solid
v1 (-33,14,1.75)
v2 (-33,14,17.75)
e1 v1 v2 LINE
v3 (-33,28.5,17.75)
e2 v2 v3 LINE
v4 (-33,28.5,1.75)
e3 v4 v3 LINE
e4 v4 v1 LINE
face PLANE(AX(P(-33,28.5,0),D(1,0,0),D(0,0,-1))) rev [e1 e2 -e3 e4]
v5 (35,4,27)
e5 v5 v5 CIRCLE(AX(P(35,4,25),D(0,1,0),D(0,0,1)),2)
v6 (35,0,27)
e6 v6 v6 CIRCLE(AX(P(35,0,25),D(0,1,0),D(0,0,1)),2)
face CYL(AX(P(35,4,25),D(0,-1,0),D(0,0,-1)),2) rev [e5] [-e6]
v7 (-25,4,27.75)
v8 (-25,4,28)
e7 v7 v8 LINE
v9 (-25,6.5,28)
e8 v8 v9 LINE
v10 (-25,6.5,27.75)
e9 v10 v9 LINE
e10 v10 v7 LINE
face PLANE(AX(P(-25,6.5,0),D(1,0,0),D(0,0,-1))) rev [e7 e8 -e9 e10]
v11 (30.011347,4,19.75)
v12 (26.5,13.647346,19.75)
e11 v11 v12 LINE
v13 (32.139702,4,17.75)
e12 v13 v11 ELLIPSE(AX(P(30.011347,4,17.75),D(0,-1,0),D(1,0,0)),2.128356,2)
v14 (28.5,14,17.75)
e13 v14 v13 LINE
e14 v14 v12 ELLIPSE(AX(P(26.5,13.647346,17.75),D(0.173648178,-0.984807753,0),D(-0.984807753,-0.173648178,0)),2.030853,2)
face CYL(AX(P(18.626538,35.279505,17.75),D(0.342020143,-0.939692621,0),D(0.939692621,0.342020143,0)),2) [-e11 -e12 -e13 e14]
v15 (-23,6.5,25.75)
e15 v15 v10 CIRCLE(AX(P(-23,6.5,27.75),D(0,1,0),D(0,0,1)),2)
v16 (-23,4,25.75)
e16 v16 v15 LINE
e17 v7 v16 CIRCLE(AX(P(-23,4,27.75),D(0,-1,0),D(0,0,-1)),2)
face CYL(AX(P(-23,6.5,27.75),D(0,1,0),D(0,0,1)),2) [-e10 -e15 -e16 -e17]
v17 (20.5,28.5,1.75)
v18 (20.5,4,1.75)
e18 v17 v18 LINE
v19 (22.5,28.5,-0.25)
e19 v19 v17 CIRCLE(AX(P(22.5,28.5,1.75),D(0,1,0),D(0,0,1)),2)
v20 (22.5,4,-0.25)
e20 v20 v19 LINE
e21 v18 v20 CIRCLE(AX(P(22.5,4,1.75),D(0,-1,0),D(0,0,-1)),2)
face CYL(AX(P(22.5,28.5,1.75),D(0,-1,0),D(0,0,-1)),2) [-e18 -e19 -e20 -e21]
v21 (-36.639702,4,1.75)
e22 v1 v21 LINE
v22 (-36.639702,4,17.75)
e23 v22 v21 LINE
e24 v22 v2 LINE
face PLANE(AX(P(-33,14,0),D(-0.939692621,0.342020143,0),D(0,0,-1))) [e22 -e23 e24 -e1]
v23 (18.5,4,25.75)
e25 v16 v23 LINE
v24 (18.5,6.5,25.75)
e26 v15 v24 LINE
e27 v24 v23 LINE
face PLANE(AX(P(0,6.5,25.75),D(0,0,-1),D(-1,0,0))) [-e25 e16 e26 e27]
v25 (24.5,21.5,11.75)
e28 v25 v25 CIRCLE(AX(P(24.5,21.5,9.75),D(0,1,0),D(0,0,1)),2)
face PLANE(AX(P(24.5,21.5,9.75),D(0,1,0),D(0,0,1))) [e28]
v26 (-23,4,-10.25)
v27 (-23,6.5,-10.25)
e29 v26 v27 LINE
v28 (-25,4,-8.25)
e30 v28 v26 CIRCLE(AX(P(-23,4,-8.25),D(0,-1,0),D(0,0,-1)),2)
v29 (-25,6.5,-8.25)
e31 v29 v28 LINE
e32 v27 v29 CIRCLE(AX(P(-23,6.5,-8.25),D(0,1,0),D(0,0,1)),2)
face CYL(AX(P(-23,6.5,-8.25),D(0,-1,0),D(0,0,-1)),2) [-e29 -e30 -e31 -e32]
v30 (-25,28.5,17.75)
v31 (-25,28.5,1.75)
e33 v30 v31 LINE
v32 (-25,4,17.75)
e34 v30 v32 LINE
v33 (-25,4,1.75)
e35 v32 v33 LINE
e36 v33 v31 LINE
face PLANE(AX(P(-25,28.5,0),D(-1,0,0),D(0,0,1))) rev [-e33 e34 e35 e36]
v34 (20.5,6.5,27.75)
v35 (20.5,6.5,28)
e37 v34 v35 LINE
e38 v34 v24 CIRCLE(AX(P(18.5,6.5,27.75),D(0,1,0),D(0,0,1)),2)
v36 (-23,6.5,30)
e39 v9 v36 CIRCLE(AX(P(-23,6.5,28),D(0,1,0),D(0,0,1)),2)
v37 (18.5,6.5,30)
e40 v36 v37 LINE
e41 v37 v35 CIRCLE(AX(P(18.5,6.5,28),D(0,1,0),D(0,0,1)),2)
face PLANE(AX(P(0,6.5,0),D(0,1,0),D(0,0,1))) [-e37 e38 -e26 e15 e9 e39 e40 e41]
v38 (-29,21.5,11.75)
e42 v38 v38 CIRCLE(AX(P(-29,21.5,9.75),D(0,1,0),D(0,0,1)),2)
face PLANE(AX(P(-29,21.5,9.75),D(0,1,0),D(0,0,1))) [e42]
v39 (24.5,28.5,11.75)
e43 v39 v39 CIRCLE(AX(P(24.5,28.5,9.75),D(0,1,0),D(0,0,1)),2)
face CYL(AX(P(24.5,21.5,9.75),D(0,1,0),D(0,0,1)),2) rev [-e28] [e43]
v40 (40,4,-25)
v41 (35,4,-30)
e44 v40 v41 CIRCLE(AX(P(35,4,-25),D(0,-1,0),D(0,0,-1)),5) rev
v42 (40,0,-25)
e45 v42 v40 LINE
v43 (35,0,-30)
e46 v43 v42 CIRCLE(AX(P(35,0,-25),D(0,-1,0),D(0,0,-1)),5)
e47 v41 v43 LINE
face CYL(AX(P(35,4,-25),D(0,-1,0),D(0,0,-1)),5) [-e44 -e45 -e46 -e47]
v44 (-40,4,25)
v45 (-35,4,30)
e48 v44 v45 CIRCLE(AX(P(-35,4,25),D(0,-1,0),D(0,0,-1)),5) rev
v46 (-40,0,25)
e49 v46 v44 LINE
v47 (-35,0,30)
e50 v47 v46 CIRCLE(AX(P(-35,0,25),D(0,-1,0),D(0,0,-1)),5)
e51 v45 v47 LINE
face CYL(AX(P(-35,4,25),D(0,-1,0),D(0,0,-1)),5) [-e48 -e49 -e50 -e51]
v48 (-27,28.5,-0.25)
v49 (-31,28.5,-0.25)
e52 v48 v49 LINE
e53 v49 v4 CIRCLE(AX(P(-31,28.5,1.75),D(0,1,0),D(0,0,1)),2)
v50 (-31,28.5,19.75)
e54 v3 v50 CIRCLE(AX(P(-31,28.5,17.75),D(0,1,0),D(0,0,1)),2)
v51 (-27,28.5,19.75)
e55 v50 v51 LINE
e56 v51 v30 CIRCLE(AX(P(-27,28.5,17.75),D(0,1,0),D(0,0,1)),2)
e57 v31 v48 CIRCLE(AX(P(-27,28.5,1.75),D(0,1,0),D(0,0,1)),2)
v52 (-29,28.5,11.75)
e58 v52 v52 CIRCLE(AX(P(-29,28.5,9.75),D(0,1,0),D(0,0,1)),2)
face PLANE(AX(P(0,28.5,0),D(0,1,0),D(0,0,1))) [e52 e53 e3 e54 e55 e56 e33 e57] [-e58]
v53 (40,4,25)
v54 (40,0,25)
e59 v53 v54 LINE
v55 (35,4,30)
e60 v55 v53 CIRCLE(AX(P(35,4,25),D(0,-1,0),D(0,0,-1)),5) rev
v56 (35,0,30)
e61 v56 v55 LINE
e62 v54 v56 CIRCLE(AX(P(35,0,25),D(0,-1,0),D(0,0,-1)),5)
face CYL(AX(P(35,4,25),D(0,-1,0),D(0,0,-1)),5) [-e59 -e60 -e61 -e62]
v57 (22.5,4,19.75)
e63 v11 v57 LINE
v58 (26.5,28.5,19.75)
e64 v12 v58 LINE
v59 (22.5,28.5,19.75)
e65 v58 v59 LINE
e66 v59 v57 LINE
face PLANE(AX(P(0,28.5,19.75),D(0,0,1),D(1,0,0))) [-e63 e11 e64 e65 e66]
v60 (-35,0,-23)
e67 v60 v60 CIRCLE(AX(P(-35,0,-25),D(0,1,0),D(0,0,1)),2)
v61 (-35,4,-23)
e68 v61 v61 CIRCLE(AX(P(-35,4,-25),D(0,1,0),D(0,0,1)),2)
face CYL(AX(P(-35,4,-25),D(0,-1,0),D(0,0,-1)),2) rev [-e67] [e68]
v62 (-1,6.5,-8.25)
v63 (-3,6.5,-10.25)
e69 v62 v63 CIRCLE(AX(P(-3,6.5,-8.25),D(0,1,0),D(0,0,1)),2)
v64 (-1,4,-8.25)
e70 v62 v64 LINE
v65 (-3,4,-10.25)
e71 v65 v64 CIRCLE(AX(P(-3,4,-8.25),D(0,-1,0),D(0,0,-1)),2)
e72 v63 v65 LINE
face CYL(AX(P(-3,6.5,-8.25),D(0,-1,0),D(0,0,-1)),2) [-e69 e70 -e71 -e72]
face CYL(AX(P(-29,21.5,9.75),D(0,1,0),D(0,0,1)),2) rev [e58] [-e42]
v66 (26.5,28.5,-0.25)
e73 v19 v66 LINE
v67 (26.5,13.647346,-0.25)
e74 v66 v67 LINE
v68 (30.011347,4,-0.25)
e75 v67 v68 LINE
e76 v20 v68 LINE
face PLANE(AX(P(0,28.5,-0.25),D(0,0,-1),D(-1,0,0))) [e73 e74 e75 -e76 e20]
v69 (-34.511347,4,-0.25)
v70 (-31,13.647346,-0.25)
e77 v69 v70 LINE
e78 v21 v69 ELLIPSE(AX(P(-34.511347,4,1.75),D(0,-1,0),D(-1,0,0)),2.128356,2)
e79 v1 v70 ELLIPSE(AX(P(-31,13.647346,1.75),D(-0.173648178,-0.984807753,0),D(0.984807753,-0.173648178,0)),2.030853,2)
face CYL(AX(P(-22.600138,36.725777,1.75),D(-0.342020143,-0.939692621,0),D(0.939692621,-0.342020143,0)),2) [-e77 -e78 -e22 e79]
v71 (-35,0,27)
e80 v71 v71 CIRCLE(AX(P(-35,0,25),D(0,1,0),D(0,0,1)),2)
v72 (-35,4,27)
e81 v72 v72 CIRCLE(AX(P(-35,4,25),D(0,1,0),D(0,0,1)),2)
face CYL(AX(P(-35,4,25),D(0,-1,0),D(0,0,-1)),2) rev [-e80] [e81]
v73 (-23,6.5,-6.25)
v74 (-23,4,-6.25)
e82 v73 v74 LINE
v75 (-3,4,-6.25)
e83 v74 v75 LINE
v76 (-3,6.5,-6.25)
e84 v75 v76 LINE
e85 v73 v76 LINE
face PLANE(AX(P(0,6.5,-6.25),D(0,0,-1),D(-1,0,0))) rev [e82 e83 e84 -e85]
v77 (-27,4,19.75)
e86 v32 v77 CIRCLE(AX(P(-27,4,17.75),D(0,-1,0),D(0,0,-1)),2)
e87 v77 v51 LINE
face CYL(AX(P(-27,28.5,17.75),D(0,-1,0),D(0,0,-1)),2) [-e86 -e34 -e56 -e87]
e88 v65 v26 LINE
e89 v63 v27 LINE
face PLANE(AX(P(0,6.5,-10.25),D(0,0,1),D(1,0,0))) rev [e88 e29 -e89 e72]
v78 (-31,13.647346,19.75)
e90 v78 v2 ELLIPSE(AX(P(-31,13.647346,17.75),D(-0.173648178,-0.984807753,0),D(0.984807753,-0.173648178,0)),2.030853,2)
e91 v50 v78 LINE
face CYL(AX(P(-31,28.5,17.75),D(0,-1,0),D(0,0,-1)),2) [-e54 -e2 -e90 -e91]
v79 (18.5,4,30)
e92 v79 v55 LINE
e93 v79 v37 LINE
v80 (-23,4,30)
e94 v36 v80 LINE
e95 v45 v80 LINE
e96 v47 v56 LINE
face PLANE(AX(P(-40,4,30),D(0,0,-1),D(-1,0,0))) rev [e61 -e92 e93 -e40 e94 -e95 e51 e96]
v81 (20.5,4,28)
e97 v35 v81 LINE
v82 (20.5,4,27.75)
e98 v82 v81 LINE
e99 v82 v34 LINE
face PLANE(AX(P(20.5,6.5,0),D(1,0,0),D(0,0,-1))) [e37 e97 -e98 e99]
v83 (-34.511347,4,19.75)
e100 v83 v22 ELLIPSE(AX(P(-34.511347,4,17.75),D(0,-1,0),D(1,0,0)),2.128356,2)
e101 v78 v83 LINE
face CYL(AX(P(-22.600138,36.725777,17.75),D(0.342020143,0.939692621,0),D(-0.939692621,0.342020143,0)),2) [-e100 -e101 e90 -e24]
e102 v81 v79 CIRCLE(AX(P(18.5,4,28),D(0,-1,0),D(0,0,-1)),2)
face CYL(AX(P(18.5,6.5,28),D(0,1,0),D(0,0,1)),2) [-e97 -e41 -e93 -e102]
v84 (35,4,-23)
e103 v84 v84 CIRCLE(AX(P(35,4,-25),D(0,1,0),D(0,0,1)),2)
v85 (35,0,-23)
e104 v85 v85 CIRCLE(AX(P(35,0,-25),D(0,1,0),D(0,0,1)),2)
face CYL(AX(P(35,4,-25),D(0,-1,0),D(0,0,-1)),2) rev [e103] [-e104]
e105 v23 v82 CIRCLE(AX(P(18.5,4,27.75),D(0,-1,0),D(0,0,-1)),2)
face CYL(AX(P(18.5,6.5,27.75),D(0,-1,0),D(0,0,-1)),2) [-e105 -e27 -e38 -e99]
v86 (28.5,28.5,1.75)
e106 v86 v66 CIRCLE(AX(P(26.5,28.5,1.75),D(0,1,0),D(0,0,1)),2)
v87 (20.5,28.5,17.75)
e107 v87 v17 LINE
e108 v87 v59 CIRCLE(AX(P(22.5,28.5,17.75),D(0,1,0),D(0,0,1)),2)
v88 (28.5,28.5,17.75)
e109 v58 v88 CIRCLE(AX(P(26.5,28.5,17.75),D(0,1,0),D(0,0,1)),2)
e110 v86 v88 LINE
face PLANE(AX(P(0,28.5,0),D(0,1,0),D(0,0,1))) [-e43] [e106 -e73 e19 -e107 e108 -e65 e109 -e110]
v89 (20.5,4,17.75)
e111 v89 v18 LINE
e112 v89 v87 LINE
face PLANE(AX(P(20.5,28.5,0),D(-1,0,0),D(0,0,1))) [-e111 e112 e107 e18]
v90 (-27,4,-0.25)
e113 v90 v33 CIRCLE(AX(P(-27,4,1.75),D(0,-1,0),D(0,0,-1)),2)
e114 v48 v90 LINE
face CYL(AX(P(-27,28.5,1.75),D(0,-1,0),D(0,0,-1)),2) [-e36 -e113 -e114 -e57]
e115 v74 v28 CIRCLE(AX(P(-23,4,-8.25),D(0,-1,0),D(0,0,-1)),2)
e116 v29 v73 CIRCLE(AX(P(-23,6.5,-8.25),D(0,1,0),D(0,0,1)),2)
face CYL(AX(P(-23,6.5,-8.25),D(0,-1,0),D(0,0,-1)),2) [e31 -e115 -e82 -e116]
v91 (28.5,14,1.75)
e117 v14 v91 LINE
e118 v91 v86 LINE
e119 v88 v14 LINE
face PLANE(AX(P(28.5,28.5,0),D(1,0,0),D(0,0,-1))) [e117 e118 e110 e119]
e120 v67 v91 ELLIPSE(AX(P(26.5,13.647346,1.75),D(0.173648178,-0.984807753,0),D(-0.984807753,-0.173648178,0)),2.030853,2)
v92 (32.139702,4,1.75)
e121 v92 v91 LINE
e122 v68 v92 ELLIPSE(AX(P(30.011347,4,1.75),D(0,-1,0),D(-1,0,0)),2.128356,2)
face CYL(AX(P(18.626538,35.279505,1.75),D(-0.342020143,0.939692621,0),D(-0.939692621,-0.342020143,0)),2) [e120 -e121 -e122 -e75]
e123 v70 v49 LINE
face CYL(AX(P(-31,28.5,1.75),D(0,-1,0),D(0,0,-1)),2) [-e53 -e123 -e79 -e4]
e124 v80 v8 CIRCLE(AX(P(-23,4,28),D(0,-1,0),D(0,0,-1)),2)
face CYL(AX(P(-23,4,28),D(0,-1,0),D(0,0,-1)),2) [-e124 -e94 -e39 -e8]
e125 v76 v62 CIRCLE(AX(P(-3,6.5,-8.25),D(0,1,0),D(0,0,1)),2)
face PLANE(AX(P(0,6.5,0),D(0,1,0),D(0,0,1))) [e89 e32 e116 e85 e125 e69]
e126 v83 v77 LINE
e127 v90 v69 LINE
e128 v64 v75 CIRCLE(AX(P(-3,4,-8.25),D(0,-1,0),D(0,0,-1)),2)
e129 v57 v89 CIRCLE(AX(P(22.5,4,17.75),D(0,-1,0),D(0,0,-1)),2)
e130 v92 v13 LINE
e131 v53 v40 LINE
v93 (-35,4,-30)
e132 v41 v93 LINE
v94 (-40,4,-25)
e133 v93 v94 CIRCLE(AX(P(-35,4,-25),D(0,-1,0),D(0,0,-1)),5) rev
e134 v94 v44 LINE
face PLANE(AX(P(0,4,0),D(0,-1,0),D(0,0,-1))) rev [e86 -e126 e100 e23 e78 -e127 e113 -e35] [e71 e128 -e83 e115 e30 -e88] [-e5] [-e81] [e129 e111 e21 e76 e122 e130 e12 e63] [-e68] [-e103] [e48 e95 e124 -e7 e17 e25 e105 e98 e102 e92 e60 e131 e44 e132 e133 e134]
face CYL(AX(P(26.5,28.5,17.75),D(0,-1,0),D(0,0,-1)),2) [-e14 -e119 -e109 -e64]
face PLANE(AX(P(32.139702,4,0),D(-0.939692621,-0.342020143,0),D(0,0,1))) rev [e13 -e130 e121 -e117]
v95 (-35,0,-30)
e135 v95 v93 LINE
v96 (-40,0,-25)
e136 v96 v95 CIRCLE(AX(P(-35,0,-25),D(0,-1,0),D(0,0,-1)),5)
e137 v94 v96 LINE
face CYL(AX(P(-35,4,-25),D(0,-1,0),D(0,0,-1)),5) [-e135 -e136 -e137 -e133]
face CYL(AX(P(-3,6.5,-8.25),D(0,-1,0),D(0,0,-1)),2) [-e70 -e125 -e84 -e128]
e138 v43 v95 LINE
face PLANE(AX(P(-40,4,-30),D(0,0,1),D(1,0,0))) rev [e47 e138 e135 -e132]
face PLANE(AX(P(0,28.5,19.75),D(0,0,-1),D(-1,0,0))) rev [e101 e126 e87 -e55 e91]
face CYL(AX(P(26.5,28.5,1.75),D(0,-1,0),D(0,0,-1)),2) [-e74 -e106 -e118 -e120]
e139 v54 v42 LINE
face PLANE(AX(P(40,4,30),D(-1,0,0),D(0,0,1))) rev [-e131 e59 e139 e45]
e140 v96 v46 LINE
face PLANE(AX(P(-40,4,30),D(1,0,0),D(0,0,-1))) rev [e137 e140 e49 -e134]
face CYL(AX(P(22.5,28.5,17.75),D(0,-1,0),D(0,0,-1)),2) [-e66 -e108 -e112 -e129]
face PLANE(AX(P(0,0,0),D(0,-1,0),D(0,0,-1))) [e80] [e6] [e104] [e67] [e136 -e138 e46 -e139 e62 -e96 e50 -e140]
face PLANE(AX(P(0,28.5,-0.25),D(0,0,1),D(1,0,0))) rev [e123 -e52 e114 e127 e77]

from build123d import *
from OCP.BRepFilletAPI import BRepFilletAPI_MakeChamfer

# Parameters (mm, degrees)
SKETCH_1_W          = 80
SKETCH_1_H          = 60
SKETCH_1_R          = 2
EXTRUDE_1_DEPTH     = 4
FILLET_1_R          = 5
SKETCH_2_W          = 24
SKETCH_2_H          = 4
SKETCH_2_W_2        = 45.5
SKETCH_2_H_2        = 4.25
EXTRUDE_2_DEPTH     = 2.5
EXTRUDE_3_DEPTH     = 24.5
SKETCH_3_R          = 2
CUT_EXTRUDE_1_DEPTH = 7
CHAMFER_1_SIZE      = 10
CHAMFER_1_SIZE2     = 3.639702343
FILLET_2_R          = 2
FILLET_3_R          = 2
FILLET_4_R          = 2


with BuildPart() as part:
    # Эскиз1 → Бобышка-Вытянуть1 (new body)
    with BuildSketch(Plane(origin=(0, 0, 0), x_dir=(1, 0, 0), z_dir=(0, 1, 0))):
        Rectangle(SKETCH_1_W, SKETCH_1_H)
        with Locations(Location((-35, 25, 0), (0, 0, 270))):
            Circle(SKETCH_1_R, mode=Mode.SUBTRACT)
        with Locations(Location((35, 25, 0), (0, 0, 270))):
            Circle(SKETCH_1_R, mode=Mode.SUBTRACT)
        with Locations(Location((-35, -25, 0), (0, 0, 270))):
            Circle(SKETCH_1_R, mode=Mode.SUBTRACT)
        with Locations(Location((35, -25, 0), (0, 0, 270))):
            Circle(SKETCH_1_R, mode=Mode.SUBTRACT)
    extrude(amount=EXTRUDE_1_DEPTH)

    # Скругление1
    fillet_1_edges = [part.edges().sort_by_distance(p)[0] for p in [
        (40, 2, 30),
        (-40, 2, 30),
        (-40, 2, -30),
        (40, 2, -30),
    ]]
    fillet(fillet_1_edges, radius=FILLET_1_R)

    # Эскиз2 → Бобышка-Вытянуть2 (add)
    with BuildSketch(Plane(origin=(0, 4, 0), x_dir=(1, 0, 0), z_dir=(0, 1, 0))):
        with Locations((-13, 8.25)):
            Rectangle(SKETCH_2_W, SKETCH_2_H)
        with Locations((-2.25, -27.875)):
            Rectangle(SKETCH_2_W_2, SKETCH_2_H_2)
    extrude(amount=EXTRUDE_2_DEPTH)

    # Эскиз2<3> → Бобышка-Вытянуть3 (add)
    with BuildSketch(Plane(origin=(0, 4, 0), x_dir=(1, 0, 0), z_dir=(0, 1, 0))):
        Polygon((20.5, -19.75), (20.5, -9.75), (20.5, 0.25), (28.5, 0.25), (28.5, -19.75), align=None)
        Polygon((-25, -19.75), (-25, -9.75), (-25, 0.25), (-33, 0.25), (-33, -19.75), align=None)
    extrude(amount=EXTRUDE_3_DEPTH)

    # Эскиз3 → Вырез-Вытянуть1 (cut)
    with BuildSketch(Plane(origin=(0, 28.5, 0), x_dir=(1, 0, 0), z_dir=(0, 1, 0))):
        with Locations(Location((-29, -9.75, 0), (0, 0, 270))):
            Circle(SKETCH_3_R)
        with Locations(Location((24.5, -9.75, 0), (0, 0, 270))):
            Circle(SKETCH_3_R)
    extrude(amount=-CUT_EXTRUDE_1_DEPTH, mode=Mode.SUBTRACT)

    # Фаска1: one chamfer whose edges measure the first distance from different faces: ONE call of the kernel's chamfer builder (chamfer() names one face for all edges)
    chamfer_1_edges_1 = [part.edges().sort_by_distance(p)[0] for p in [
        (28.5, 4, 9.75),
    ]]
    chamfer_1_side_1 = [part.faces().sort_by_distance(p)[0] for p in [
        (28.5, 16.25, 9.75),
    ]]
    chamfer_1_edges_2 = [part.edges().sort_by_distance(p)[0] for p in [
        (-33, 4, 9.75),
    ]]
    chamfer_1_side_2 = [part.faces().sort_by_distance(p)[0] for p in [
        (-33, 16.25, 9.75),
    ]]
    chamfer_1 = BRepFilletAPI_MakeChamfer(part.part.solid().wrapped)
    for e in chamfer_1_edges_1:
        chamfer_1.Add(CHAMFER_1_SIZE, CHAMFER_1_SIZE2, e.wrapped, chamfer_1_side_1[0].wrapped)  # the first distance lies on this face
    for e in chamfer_1_edges_2:
        chamfer_1.Add(CHAMFER_1_SIZE, CHAMFER_1_SIZE2, e.wrapped, chamfer_1_side_2[0].wrapped)  # the first distance lies on this face
    add(Compound.cast(chamfer_1.Shape()), mode=Mode.REPLACE)

    # Скругление2
    fillet_2_edges = [part.edges().sort_by_distance(p)[0] for p in [
        (-34.819851171, 9, 19.75),
        (-34.819851171, 9, -0.25),
        (30.319851171, 9, 19.75),
        (30.319851171, 9, -0.25),
        (20.5, 16.25, -0.25),
        (20.5, 16.25, 19.75),
        (-25, 16.25, 19.75),
        (-25, 16.25, -0.25),
    ]]
    fillet(fillet_2_edges, radius=FILLET_2_R)

    # Скругление3
    fillet_3_edges = [part.edges().sort_by_distance(p)[0] for p in [
        (-25, 5.25, -6.25),
        (-1, 5.25, -10.25),
        (-25, 5.25, -10.25),
        (-1, 5.25, -6.25),
        (20.5, 5.25, 25.75),
        (20.5, 5.25, 30),
        (-25, 5.25, 30),
        (-25, 5.25, 25.75),
    ]]
    fillet(fillet_3_edges, radius=FILLET_3_R - 0.0001)  # a hair under: the kernel refuses the full size

    # Скругление4
    fillet_4_edges = [part.edges().sort_by_distance(p)[0] for p in [
        (28.5, 18.3261956, -0.25),
        (28.5, 18.3261956, 19.75),
        (-33, 18.3261956, -0.25),
        (-33, 18.3261956, 19.75),
    ]]
    fillet(fillet_4_edges, radius=FILLET_4_R)


solid = part.part
